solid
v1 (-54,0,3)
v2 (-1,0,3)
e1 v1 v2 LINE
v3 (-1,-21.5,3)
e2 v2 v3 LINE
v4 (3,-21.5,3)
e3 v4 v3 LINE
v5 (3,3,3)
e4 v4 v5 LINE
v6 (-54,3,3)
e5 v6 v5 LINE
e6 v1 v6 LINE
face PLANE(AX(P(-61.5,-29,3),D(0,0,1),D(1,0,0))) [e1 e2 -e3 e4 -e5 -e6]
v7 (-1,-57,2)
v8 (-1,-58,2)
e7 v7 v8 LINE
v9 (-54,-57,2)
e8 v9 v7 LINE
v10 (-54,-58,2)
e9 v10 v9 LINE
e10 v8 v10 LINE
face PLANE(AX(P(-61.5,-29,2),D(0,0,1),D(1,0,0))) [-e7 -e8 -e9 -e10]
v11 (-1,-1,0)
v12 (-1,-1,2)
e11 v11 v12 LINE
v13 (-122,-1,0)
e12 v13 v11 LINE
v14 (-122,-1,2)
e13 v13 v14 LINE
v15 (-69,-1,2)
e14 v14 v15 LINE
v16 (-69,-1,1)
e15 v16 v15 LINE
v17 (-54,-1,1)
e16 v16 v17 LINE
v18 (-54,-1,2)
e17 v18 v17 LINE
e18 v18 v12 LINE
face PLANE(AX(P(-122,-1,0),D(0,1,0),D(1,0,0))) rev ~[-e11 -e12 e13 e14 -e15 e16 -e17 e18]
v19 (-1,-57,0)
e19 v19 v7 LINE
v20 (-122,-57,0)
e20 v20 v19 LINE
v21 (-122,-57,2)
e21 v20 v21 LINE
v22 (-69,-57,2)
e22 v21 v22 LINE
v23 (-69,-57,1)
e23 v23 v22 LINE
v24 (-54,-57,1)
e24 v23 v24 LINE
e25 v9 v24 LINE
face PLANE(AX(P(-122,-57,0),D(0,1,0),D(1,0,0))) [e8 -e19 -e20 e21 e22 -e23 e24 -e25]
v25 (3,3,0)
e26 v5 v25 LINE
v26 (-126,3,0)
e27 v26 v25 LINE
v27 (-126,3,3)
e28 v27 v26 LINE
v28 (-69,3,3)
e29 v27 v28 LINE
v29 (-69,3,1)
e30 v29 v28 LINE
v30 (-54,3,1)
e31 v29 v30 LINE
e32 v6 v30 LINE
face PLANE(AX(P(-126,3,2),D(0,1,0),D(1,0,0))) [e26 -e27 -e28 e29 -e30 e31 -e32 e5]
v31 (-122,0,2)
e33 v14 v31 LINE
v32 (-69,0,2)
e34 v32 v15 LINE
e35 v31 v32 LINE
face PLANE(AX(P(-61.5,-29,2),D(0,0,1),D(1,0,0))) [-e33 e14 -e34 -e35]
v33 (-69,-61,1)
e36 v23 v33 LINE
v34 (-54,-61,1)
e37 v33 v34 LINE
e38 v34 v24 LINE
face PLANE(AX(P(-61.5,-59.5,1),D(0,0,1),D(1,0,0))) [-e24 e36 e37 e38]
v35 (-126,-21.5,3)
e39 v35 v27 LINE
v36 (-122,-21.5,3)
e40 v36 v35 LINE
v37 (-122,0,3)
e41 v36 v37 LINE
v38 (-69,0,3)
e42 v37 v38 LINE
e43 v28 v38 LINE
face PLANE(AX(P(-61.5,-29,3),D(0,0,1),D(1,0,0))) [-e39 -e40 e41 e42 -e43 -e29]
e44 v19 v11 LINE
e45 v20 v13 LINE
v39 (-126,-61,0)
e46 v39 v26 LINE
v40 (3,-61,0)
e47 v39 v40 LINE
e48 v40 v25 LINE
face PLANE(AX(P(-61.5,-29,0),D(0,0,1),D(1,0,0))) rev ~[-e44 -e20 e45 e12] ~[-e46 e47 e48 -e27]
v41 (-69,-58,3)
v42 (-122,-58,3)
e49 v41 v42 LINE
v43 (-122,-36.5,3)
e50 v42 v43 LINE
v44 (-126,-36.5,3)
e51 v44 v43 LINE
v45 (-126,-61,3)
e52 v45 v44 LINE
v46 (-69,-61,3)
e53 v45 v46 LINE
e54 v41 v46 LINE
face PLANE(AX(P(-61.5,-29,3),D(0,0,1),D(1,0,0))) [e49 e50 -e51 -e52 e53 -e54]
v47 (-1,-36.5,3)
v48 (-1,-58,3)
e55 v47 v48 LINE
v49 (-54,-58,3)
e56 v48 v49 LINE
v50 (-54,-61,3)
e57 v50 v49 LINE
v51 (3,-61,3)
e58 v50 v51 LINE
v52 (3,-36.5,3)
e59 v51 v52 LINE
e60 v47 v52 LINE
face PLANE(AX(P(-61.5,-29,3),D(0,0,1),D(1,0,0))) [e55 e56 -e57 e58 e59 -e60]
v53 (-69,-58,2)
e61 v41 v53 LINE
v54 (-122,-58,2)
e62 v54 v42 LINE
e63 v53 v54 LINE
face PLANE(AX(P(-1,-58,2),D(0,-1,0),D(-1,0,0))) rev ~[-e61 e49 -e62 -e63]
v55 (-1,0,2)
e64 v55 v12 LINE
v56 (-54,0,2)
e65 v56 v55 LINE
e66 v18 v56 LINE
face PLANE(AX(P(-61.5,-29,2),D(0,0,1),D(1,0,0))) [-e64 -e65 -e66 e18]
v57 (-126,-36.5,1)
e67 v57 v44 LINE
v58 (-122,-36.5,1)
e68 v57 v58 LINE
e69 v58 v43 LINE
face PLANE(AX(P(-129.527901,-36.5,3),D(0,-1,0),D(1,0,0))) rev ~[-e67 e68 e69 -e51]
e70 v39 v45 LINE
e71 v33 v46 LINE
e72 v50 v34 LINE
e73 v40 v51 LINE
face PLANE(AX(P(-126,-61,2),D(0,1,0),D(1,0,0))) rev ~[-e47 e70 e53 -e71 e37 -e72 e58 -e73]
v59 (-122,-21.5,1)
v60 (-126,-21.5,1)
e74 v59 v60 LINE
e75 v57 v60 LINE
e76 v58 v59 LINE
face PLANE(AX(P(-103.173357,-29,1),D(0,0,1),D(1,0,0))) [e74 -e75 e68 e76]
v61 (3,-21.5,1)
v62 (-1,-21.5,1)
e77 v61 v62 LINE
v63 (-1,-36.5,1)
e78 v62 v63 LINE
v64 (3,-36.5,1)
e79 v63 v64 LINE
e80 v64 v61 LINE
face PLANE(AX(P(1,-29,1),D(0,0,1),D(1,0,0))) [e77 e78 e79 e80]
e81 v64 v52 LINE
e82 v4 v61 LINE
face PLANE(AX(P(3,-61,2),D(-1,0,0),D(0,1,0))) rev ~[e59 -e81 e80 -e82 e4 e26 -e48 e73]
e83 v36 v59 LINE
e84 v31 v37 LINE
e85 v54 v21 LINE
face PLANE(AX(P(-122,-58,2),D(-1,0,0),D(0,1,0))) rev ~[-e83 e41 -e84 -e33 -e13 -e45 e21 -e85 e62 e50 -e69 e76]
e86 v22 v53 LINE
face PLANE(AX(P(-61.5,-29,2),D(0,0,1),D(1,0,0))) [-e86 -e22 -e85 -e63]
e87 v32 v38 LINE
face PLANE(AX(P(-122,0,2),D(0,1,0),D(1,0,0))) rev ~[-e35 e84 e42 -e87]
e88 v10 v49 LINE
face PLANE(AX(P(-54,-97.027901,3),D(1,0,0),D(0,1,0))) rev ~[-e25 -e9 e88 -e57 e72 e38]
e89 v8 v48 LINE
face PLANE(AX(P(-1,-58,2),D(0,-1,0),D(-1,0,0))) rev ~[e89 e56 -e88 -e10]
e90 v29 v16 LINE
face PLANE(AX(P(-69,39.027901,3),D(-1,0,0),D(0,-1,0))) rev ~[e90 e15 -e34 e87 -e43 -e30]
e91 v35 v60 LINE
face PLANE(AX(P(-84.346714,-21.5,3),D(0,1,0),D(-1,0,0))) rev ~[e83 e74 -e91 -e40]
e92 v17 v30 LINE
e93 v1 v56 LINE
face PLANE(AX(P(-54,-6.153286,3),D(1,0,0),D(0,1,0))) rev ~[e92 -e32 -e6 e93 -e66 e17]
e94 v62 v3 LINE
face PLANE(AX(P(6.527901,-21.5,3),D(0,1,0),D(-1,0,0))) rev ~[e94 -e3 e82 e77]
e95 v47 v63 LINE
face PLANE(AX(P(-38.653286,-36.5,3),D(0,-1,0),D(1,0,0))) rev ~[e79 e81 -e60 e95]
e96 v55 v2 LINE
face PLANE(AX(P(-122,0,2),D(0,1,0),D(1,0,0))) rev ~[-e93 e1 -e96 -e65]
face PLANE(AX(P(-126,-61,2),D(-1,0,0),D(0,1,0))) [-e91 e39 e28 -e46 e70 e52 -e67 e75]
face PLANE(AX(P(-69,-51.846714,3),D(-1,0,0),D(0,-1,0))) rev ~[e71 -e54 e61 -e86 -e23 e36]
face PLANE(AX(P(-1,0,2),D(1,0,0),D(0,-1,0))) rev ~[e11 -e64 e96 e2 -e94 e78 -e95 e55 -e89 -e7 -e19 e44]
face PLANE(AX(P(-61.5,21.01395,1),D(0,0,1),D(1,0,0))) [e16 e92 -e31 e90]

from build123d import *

# Parameters (mm, degrees)
F0_W     = 129
F0_H     = 64
F0_W_2   = 123
F0_H_2   = 58
F0_W_3   = 121
F0_H_3   = 56
F1_DEPTH = 2
F2_W     = 129
F2_H     = 64
F3_DEPTH = 1
F4_W     = 15
F4_H     = 36.0279009569
F4_H_2   = 3
F4_H_3   = 6.1532862581
F4_W_2   = 4
F4_H_4   = 15
F4_W_3   = 3.5279009569
F4_W_4   = 37.6532862581
F5_DEPTH = 2


with BuildPart() as f1:
    # F0 (on Top) → F1 (new body)
    with BuildSketch(Plane.XY):
        with Locations((-61.5, -29)):
            Rectangle(F0_W, F0_H)
        with Locations((-61.5, -29)):
            Rectangle(F0_W_2, F0_H_2, mode=Mode.SUBTRACT)
        with Locations((-61.5, -29)):
            Rectangle(F0_W_2, F0_H_2)
        with Locations((-61.5, -29)):
            Rectangle(F0_W_3, F0_H_3, mode=Mode.SUBTRACT)
    extrude(amount=F1_DEPTH)

    # F2 (on face) → F3 (join)
    with BuildSketch(Plane.XY.offset(2)):
        with Locations((-61.5, -29)):
            Rectangle(F2_W, F2_H)
        Polygon((-122, 0), (-1, 0), (-1, -1), (-1, -57), (-1, -58), (-122, -58), (-122, -57), (-122, -1), align=None, mode=Mode.SUBTRACT)
    extrude(amount=F3_DEPTH)

    # F4 (on face) → F5 (cut)
    with BuildSketch(Plane.XY.offset(3)):
        with Locations((-61.5, 21.0139504785)):
            Rectangle(F4_W, F4_H)
        with Locations((-61.5, 1.5)):
            Rectangle(F4_W, F4_H_2)
        with Locations((-61.5, -3.0766431291)):
            Rectangle(F4_W, F4_H_3)
        with Locations((1, -29)):
            Rectangle(F4_W_2, F4_H_4)
        with Locations((4.7639504785, -29)):
            Rectangle(F4_W_3, F4_H_4)
        with Locations((-19.8266431291, -29)):
            Rectangle(F4_W_4, F4_H_4)
        with Locations((-61.5, -59.5)):
            Rectangle(F4_W, F4_H_2)
        with Locations((-61.5, -54.9233568709)):
            Rectangle(F4_W, F4_H_3)
        with Locations((-61.5, -79.0139504785)):
            Rectangle(F4_W, F4_H)
        with Locations((-103.1733568709, -29)):
            Rectangle(F4_W_4, F4_H_4)
        with Locations((-124, -29)):
            Rectangle(F4_W_2, F4_H_4)
        with Locations((-127.7639504785, -29)):
            Rectangle(F4_W_3, F4_H_4)
    extrude(amount=-F5_DEPTH, mode=Mode.SUBTRACT)


solid = f1.part
